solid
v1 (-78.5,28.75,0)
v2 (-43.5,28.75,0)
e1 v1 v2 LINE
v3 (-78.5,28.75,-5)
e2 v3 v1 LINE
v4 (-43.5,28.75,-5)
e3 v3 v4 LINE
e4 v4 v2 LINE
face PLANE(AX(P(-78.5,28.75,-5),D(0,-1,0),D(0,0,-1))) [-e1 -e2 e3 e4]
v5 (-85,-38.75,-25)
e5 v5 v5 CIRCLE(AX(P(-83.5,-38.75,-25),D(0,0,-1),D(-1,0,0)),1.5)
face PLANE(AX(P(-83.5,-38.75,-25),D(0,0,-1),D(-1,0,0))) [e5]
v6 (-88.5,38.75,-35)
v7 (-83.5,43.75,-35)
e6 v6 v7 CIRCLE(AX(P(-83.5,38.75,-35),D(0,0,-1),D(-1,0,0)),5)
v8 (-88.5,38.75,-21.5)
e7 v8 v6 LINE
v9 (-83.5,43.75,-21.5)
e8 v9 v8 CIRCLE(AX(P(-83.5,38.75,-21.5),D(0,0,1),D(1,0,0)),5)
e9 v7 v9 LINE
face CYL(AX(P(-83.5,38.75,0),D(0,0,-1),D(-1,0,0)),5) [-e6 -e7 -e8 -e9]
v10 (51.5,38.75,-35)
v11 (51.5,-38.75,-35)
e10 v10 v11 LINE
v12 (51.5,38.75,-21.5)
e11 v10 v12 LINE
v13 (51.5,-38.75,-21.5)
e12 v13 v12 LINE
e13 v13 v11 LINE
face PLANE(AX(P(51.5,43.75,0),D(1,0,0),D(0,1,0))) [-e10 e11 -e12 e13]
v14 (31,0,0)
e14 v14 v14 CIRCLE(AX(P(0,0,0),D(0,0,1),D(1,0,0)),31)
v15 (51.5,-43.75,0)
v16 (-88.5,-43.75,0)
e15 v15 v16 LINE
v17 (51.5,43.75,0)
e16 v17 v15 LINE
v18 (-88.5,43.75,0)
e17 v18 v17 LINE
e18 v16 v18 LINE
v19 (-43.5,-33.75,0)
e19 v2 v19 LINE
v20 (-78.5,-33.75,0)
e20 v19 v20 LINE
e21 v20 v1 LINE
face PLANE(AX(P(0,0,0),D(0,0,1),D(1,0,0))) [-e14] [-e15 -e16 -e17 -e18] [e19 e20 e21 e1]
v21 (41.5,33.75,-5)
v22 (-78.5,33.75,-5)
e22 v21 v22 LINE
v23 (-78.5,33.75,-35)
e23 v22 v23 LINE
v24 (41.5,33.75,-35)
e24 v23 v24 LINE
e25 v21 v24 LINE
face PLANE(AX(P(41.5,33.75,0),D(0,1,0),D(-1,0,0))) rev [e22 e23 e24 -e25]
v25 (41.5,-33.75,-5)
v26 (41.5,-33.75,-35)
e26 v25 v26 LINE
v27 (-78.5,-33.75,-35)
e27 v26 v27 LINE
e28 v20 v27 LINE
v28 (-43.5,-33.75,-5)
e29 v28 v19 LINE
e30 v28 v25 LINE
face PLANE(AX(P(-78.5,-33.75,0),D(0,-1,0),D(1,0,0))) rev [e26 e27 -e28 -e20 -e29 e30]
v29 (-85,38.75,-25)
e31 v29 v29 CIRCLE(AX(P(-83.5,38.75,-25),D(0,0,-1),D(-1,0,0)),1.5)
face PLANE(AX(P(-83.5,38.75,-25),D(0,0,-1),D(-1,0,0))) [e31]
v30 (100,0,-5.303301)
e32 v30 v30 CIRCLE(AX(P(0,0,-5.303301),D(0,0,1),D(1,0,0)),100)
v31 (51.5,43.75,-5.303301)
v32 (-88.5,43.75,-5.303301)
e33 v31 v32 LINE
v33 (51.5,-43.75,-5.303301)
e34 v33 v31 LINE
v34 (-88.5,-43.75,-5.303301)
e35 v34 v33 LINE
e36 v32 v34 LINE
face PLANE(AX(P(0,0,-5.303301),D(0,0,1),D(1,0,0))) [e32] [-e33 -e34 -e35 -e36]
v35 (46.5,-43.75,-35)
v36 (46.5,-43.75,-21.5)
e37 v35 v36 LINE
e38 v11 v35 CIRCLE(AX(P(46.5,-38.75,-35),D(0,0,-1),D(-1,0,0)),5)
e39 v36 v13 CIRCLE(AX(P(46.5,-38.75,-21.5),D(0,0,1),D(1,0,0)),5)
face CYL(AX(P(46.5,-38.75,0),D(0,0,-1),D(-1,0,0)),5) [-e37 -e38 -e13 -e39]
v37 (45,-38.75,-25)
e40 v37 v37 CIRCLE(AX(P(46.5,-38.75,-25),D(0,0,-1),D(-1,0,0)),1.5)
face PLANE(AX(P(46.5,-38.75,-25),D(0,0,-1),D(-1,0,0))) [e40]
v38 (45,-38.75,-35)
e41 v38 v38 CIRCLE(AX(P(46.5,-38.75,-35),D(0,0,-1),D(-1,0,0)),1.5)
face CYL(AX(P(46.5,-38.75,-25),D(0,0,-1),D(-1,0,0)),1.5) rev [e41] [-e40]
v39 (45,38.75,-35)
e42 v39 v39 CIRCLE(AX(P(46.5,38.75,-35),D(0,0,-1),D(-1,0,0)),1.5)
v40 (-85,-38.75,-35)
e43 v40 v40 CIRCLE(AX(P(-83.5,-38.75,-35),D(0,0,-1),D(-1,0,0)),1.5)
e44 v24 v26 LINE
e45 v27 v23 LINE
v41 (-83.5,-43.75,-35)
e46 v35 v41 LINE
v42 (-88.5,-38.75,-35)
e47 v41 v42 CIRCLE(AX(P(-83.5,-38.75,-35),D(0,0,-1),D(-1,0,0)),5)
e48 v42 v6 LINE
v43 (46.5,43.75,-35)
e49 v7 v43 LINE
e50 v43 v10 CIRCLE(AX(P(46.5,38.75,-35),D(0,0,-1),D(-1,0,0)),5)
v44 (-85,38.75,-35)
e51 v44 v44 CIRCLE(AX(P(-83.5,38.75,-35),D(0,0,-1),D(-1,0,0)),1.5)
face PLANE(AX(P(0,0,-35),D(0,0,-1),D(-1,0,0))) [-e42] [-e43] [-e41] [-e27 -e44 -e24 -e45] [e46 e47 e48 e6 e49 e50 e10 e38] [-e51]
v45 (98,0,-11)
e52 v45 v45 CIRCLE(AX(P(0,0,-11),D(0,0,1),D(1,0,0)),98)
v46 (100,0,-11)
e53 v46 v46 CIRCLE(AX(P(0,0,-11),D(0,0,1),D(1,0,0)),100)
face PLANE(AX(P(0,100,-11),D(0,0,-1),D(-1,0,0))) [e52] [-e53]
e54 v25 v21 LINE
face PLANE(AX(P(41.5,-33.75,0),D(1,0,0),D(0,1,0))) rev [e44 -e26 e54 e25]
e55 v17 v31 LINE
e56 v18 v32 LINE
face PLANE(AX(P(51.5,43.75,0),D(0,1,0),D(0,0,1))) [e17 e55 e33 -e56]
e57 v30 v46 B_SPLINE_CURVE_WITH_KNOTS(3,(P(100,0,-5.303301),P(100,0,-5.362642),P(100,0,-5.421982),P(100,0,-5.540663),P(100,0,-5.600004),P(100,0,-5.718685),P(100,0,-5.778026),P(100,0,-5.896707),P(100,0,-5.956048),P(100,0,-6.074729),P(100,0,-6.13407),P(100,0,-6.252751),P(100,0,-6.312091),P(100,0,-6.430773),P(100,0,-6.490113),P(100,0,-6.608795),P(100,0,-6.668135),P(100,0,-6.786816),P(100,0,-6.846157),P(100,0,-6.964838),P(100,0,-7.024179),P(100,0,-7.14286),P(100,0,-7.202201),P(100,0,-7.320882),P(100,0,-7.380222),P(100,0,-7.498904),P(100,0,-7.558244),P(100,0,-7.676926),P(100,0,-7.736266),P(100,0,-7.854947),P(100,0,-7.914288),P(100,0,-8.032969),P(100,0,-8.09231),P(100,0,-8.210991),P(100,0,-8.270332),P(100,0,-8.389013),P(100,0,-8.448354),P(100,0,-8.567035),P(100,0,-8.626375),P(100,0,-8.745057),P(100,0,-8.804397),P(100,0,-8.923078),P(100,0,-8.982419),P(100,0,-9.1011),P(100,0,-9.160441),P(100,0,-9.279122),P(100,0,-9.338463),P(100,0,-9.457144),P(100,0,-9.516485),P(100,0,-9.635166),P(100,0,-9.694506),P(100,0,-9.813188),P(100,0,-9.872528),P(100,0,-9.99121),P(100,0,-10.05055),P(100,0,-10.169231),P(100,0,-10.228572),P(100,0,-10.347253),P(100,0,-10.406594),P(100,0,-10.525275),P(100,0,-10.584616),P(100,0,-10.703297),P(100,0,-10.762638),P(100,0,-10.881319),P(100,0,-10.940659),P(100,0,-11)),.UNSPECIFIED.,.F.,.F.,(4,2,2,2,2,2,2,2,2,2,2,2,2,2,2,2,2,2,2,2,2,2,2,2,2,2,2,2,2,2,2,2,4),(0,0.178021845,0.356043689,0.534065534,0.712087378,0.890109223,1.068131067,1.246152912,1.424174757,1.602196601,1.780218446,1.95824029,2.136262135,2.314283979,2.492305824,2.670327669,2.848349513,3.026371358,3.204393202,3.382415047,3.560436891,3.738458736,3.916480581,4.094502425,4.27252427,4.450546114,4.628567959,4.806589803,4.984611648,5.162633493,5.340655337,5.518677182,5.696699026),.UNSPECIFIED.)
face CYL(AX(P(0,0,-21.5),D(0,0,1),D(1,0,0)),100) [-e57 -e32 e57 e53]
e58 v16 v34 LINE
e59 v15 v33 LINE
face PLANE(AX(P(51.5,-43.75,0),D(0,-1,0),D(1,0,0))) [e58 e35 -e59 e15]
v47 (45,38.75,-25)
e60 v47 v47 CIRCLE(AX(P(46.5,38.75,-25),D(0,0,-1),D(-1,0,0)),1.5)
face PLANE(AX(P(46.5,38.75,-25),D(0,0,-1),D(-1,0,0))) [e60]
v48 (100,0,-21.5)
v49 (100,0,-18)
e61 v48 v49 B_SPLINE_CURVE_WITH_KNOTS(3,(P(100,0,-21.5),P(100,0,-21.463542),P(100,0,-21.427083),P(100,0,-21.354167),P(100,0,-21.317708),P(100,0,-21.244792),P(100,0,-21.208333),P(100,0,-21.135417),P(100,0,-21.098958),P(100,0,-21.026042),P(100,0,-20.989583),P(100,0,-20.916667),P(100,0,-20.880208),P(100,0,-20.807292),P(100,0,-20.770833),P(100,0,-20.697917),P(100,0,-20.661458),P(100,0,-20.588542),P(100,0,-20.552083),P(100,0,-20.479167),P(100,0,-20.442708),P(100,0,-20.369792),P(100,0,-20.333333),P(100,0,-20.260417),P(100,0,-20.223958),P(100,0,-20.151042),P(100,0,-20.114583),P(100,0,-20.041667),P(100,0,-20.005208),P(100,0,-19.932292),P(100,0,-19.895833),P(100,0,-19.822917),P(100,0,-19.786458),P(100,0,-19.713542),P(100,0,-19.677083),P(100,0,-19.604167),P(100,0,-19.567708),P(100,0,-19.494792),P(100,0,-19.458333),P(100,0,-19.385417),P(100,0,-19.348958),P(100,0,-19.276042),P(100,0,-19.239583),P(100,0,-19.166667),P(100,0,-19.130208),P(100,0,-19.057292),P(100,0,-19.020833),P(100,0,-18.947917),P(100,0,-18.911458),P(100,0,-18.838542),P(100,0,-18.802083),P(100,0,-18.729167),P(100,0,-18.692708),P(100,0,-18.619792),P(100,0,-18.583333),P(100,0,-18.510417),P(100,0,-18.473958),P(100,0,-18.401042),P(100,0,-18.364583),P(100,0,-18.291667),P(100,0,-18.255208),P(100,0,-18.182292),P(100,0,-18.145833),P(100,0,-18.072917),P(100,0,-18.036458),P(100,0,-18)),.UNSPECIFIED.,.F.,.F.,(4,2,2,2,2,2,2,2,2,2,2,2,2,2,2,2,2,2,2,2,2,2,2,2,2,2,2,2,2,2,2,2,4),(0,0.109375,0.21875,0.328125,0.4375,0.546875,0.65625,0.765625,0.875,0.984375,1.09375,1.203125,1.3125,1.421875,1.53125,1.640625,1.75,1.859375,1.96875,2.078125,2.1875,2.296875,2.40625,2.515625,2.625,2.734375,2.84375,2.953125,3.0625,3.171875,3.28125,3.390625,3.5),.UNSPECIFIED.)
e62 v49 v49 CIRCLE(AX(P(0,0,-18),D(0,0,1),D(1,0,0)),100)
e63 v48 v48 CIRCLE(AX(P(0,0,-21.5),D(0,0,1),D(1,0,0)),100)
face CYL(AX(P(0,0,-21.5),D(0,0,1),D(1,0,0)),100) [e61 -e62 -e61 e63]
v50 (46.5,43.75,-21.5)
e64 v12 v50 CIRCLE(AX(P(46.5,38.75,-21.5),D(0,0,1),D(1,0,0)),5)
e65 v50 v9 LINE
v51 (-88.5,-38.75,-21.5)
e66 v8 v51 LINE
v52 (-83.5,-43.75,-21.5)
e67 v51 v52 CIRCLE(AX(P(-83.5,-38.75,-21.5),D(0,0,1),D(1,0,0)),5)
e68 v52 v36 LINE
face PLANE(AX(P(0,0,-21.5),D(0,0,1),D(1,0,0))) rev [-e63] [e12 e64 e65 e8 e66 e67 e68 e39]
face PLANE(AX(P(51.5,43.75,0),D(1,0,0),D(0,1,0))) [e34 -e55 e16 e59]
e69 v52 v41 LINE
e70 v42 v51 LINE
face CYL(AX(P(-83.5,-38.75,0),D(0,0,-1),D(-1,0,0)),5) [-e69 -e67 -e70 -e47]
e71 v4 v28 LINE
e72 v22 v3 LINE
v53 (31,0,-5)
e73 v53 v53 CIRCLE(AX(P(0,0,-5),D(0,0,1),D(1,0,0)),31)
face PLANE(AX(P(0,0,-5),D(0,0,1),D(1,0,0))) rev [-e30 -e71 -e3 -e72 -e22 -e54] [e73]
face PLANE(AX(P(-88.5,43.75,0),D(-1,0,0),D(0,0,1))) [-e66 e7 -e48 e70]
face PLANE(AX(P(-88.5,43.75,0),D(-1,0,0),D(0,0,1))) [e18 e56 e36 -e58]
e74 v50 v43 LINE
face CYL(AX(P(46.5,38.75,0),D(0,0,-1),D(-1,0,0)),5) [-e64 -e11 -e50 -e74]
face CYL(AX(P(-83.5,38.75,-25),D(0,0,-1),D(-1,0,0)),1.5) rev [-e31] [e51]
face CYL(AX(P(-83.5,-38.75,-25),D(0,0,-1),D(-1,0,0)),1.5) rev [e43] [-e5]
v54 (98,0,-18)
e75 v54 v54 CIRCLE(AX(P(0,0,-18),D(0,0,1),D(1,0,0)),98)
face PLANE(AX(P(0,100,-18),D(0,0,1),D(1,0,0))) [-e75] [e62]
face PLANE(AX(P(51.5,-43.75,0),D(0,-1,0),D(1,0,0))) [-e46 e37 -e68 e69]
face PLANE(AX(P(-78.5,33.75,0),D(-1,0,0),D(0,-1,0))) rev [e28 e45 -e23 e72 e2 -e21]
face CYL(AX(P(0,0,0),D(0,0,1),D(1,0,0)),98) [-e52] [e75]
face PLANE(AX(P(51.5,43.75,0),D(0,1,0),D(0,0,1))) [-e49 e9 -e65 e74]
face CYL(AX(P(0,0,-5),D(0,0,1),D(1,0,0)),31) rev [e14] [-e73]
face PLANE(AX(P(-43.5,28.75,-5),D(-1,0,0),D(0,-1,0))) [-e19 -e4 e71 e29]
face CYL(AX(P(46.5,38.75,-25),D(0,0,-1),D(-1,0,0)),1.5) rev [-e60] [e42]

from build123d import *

# Parameters (mm, degrees)
SKETCH1_R                = 31
BOSS_EXTRUDE1_DEPTH      = 5
BOSS_EXTRUDE2_DEPTH      = 30
BOSS_EXTRUDE2_DEPTH_BACK = 5
SKETCH2_W                = 140
SKETCH2_H                = 87.5
SKETCH2_W_2              = 120
SKETCH2_H_2              = 67.5
BOSS_EXTRUDE3_START      = -6.5
BOSS_EXTRUDE3_OUTLINE_R  = 100
BOSS_EXTRUDE3_OUTLINE_W  = 140
BOSS_EXTRUDE3_OUTLINE_H  = 87.5
BOSS_EXTRUDE3_DEPTH      = 16.196699026
SKETCH4_W                = 7
SKETCH4_H                = 2
FILLET1_R                = 5
SKETCH5_R                = 1.5
CUT_EXTRUDE1_DEPTH       = 10


# Read off the part's stored shape, not the designer's step: Boss-Extrude3
with BuildPart() as part:
    # Sketch1 → Boss-Extrude1 (new body)
    with BuildSketch(Plane.XY):
        Polygon((41.5, 33.75), (-78.5, 33.75), (-78.5, 28.75), (-43.5, 28.75), (-43.5, -33.75), (41.5, -33.75), align=None)
        Circle(SKETCH1_R, mode=Mode.SUBTRACT)
    extrude(amount=-BOSS_EXTRUDE1_DEPTH)

    # Sketch2 → Boss-Extrude2 (add, two sides: drawn at the far end of the back side and taken through both)
    with BuildSketch(Plane(origin=(0, 0, -5), x_dir=(-1, 0, 0), z_dir=(0, 0, -1)).offset(-BOSS_EXTRUDE2_DEPTH_BACK)):
        with Locations((18.5, 0)):
            Rectangle(SKETCH2_W, SKETCH2_H)
        with Locations((18.5, 0)):
            Rectangle(SKETCH2_W_2, SKETCH2_H_2, mode=Mode.SUBTRACT)
    extrude(amount=BOSS_EXTRUDE2_DEPTH + BOSS_EXTRUDE2_DEPTH_BACK)

    # Boss-Extrude3 outline → Boss-Extrude3 (add)
    with BuildSketch(Plane.XY.offset(-15).offset(BOSS_EXTRUDE3_START)):
        Circle(BOSS_EXTRUDE3_OUTLINE_R)
        with Locations((-18.5, 0)):
            Rectangle(BOSS_EXTRUDE3_OUTLINE_W, BOSS_EXTRUDE3_OUTLINE_H, mode=Mode.SUBTRACT)
    extrude(amount=BOSS_EXTRUDE3_DEPTH)

    # Sketch4 → Cut-Revolve1 (revolve, cut)
    with BuildSketch(Plane(origin=(0, 0, 0), x_dir=(0, 0, -1), z_dir=(1, 0, 0)), mode=Mode.PRIVATE) as cut_revolve1_sk:
        with Locations((14.5, 99)):
            Rectangle(SKETCH4_W, SKETCH4_H)
    revolve(cut_revolve1_sk.sketch.rotate(Axis((0, 0, 0), (0, 0, -1)), 90), axis=Axis((0, 0, 0), (0, 0, -1)), mode=Mode.SUBTRACT)

    # Fillet1
    fillet1_edges = [part.edges().sort_by_distance(p)[0] for p in [
        (-88.5, -43.75, -28.25),
        (51.5, -43.75, -28.25),
        (-88.5, 43.75, -28.25),
        (51.5, 43.75, -28.25),
    ]]
    fillet(fillet1_edges, radius=FILLET1_R)

    # Sketch5 → Cut-Extrude1 (cut)
    with BuildSketch(Plane(origin=(0, 0, -35), x_dir=(-1, 0, 0), z_dir=(0, 0, -1))):
        with Locations((-46.5, 38.75)):
            Circle(SKETCH5_R)
        with Locations((-46.5, -38.75)):
            Circle(SKETCH5_R)
        with Locations((83.5, -38.75)):
            Circle(SKETCH5_R)
        with Locations((83.5, 38.75)):
            Circle(SKETCH5_R)
    extrude(amount=-CUT_EXTRUDE1_DEPTH, mode=Mode.SUBTRACT)


solid = part.part
